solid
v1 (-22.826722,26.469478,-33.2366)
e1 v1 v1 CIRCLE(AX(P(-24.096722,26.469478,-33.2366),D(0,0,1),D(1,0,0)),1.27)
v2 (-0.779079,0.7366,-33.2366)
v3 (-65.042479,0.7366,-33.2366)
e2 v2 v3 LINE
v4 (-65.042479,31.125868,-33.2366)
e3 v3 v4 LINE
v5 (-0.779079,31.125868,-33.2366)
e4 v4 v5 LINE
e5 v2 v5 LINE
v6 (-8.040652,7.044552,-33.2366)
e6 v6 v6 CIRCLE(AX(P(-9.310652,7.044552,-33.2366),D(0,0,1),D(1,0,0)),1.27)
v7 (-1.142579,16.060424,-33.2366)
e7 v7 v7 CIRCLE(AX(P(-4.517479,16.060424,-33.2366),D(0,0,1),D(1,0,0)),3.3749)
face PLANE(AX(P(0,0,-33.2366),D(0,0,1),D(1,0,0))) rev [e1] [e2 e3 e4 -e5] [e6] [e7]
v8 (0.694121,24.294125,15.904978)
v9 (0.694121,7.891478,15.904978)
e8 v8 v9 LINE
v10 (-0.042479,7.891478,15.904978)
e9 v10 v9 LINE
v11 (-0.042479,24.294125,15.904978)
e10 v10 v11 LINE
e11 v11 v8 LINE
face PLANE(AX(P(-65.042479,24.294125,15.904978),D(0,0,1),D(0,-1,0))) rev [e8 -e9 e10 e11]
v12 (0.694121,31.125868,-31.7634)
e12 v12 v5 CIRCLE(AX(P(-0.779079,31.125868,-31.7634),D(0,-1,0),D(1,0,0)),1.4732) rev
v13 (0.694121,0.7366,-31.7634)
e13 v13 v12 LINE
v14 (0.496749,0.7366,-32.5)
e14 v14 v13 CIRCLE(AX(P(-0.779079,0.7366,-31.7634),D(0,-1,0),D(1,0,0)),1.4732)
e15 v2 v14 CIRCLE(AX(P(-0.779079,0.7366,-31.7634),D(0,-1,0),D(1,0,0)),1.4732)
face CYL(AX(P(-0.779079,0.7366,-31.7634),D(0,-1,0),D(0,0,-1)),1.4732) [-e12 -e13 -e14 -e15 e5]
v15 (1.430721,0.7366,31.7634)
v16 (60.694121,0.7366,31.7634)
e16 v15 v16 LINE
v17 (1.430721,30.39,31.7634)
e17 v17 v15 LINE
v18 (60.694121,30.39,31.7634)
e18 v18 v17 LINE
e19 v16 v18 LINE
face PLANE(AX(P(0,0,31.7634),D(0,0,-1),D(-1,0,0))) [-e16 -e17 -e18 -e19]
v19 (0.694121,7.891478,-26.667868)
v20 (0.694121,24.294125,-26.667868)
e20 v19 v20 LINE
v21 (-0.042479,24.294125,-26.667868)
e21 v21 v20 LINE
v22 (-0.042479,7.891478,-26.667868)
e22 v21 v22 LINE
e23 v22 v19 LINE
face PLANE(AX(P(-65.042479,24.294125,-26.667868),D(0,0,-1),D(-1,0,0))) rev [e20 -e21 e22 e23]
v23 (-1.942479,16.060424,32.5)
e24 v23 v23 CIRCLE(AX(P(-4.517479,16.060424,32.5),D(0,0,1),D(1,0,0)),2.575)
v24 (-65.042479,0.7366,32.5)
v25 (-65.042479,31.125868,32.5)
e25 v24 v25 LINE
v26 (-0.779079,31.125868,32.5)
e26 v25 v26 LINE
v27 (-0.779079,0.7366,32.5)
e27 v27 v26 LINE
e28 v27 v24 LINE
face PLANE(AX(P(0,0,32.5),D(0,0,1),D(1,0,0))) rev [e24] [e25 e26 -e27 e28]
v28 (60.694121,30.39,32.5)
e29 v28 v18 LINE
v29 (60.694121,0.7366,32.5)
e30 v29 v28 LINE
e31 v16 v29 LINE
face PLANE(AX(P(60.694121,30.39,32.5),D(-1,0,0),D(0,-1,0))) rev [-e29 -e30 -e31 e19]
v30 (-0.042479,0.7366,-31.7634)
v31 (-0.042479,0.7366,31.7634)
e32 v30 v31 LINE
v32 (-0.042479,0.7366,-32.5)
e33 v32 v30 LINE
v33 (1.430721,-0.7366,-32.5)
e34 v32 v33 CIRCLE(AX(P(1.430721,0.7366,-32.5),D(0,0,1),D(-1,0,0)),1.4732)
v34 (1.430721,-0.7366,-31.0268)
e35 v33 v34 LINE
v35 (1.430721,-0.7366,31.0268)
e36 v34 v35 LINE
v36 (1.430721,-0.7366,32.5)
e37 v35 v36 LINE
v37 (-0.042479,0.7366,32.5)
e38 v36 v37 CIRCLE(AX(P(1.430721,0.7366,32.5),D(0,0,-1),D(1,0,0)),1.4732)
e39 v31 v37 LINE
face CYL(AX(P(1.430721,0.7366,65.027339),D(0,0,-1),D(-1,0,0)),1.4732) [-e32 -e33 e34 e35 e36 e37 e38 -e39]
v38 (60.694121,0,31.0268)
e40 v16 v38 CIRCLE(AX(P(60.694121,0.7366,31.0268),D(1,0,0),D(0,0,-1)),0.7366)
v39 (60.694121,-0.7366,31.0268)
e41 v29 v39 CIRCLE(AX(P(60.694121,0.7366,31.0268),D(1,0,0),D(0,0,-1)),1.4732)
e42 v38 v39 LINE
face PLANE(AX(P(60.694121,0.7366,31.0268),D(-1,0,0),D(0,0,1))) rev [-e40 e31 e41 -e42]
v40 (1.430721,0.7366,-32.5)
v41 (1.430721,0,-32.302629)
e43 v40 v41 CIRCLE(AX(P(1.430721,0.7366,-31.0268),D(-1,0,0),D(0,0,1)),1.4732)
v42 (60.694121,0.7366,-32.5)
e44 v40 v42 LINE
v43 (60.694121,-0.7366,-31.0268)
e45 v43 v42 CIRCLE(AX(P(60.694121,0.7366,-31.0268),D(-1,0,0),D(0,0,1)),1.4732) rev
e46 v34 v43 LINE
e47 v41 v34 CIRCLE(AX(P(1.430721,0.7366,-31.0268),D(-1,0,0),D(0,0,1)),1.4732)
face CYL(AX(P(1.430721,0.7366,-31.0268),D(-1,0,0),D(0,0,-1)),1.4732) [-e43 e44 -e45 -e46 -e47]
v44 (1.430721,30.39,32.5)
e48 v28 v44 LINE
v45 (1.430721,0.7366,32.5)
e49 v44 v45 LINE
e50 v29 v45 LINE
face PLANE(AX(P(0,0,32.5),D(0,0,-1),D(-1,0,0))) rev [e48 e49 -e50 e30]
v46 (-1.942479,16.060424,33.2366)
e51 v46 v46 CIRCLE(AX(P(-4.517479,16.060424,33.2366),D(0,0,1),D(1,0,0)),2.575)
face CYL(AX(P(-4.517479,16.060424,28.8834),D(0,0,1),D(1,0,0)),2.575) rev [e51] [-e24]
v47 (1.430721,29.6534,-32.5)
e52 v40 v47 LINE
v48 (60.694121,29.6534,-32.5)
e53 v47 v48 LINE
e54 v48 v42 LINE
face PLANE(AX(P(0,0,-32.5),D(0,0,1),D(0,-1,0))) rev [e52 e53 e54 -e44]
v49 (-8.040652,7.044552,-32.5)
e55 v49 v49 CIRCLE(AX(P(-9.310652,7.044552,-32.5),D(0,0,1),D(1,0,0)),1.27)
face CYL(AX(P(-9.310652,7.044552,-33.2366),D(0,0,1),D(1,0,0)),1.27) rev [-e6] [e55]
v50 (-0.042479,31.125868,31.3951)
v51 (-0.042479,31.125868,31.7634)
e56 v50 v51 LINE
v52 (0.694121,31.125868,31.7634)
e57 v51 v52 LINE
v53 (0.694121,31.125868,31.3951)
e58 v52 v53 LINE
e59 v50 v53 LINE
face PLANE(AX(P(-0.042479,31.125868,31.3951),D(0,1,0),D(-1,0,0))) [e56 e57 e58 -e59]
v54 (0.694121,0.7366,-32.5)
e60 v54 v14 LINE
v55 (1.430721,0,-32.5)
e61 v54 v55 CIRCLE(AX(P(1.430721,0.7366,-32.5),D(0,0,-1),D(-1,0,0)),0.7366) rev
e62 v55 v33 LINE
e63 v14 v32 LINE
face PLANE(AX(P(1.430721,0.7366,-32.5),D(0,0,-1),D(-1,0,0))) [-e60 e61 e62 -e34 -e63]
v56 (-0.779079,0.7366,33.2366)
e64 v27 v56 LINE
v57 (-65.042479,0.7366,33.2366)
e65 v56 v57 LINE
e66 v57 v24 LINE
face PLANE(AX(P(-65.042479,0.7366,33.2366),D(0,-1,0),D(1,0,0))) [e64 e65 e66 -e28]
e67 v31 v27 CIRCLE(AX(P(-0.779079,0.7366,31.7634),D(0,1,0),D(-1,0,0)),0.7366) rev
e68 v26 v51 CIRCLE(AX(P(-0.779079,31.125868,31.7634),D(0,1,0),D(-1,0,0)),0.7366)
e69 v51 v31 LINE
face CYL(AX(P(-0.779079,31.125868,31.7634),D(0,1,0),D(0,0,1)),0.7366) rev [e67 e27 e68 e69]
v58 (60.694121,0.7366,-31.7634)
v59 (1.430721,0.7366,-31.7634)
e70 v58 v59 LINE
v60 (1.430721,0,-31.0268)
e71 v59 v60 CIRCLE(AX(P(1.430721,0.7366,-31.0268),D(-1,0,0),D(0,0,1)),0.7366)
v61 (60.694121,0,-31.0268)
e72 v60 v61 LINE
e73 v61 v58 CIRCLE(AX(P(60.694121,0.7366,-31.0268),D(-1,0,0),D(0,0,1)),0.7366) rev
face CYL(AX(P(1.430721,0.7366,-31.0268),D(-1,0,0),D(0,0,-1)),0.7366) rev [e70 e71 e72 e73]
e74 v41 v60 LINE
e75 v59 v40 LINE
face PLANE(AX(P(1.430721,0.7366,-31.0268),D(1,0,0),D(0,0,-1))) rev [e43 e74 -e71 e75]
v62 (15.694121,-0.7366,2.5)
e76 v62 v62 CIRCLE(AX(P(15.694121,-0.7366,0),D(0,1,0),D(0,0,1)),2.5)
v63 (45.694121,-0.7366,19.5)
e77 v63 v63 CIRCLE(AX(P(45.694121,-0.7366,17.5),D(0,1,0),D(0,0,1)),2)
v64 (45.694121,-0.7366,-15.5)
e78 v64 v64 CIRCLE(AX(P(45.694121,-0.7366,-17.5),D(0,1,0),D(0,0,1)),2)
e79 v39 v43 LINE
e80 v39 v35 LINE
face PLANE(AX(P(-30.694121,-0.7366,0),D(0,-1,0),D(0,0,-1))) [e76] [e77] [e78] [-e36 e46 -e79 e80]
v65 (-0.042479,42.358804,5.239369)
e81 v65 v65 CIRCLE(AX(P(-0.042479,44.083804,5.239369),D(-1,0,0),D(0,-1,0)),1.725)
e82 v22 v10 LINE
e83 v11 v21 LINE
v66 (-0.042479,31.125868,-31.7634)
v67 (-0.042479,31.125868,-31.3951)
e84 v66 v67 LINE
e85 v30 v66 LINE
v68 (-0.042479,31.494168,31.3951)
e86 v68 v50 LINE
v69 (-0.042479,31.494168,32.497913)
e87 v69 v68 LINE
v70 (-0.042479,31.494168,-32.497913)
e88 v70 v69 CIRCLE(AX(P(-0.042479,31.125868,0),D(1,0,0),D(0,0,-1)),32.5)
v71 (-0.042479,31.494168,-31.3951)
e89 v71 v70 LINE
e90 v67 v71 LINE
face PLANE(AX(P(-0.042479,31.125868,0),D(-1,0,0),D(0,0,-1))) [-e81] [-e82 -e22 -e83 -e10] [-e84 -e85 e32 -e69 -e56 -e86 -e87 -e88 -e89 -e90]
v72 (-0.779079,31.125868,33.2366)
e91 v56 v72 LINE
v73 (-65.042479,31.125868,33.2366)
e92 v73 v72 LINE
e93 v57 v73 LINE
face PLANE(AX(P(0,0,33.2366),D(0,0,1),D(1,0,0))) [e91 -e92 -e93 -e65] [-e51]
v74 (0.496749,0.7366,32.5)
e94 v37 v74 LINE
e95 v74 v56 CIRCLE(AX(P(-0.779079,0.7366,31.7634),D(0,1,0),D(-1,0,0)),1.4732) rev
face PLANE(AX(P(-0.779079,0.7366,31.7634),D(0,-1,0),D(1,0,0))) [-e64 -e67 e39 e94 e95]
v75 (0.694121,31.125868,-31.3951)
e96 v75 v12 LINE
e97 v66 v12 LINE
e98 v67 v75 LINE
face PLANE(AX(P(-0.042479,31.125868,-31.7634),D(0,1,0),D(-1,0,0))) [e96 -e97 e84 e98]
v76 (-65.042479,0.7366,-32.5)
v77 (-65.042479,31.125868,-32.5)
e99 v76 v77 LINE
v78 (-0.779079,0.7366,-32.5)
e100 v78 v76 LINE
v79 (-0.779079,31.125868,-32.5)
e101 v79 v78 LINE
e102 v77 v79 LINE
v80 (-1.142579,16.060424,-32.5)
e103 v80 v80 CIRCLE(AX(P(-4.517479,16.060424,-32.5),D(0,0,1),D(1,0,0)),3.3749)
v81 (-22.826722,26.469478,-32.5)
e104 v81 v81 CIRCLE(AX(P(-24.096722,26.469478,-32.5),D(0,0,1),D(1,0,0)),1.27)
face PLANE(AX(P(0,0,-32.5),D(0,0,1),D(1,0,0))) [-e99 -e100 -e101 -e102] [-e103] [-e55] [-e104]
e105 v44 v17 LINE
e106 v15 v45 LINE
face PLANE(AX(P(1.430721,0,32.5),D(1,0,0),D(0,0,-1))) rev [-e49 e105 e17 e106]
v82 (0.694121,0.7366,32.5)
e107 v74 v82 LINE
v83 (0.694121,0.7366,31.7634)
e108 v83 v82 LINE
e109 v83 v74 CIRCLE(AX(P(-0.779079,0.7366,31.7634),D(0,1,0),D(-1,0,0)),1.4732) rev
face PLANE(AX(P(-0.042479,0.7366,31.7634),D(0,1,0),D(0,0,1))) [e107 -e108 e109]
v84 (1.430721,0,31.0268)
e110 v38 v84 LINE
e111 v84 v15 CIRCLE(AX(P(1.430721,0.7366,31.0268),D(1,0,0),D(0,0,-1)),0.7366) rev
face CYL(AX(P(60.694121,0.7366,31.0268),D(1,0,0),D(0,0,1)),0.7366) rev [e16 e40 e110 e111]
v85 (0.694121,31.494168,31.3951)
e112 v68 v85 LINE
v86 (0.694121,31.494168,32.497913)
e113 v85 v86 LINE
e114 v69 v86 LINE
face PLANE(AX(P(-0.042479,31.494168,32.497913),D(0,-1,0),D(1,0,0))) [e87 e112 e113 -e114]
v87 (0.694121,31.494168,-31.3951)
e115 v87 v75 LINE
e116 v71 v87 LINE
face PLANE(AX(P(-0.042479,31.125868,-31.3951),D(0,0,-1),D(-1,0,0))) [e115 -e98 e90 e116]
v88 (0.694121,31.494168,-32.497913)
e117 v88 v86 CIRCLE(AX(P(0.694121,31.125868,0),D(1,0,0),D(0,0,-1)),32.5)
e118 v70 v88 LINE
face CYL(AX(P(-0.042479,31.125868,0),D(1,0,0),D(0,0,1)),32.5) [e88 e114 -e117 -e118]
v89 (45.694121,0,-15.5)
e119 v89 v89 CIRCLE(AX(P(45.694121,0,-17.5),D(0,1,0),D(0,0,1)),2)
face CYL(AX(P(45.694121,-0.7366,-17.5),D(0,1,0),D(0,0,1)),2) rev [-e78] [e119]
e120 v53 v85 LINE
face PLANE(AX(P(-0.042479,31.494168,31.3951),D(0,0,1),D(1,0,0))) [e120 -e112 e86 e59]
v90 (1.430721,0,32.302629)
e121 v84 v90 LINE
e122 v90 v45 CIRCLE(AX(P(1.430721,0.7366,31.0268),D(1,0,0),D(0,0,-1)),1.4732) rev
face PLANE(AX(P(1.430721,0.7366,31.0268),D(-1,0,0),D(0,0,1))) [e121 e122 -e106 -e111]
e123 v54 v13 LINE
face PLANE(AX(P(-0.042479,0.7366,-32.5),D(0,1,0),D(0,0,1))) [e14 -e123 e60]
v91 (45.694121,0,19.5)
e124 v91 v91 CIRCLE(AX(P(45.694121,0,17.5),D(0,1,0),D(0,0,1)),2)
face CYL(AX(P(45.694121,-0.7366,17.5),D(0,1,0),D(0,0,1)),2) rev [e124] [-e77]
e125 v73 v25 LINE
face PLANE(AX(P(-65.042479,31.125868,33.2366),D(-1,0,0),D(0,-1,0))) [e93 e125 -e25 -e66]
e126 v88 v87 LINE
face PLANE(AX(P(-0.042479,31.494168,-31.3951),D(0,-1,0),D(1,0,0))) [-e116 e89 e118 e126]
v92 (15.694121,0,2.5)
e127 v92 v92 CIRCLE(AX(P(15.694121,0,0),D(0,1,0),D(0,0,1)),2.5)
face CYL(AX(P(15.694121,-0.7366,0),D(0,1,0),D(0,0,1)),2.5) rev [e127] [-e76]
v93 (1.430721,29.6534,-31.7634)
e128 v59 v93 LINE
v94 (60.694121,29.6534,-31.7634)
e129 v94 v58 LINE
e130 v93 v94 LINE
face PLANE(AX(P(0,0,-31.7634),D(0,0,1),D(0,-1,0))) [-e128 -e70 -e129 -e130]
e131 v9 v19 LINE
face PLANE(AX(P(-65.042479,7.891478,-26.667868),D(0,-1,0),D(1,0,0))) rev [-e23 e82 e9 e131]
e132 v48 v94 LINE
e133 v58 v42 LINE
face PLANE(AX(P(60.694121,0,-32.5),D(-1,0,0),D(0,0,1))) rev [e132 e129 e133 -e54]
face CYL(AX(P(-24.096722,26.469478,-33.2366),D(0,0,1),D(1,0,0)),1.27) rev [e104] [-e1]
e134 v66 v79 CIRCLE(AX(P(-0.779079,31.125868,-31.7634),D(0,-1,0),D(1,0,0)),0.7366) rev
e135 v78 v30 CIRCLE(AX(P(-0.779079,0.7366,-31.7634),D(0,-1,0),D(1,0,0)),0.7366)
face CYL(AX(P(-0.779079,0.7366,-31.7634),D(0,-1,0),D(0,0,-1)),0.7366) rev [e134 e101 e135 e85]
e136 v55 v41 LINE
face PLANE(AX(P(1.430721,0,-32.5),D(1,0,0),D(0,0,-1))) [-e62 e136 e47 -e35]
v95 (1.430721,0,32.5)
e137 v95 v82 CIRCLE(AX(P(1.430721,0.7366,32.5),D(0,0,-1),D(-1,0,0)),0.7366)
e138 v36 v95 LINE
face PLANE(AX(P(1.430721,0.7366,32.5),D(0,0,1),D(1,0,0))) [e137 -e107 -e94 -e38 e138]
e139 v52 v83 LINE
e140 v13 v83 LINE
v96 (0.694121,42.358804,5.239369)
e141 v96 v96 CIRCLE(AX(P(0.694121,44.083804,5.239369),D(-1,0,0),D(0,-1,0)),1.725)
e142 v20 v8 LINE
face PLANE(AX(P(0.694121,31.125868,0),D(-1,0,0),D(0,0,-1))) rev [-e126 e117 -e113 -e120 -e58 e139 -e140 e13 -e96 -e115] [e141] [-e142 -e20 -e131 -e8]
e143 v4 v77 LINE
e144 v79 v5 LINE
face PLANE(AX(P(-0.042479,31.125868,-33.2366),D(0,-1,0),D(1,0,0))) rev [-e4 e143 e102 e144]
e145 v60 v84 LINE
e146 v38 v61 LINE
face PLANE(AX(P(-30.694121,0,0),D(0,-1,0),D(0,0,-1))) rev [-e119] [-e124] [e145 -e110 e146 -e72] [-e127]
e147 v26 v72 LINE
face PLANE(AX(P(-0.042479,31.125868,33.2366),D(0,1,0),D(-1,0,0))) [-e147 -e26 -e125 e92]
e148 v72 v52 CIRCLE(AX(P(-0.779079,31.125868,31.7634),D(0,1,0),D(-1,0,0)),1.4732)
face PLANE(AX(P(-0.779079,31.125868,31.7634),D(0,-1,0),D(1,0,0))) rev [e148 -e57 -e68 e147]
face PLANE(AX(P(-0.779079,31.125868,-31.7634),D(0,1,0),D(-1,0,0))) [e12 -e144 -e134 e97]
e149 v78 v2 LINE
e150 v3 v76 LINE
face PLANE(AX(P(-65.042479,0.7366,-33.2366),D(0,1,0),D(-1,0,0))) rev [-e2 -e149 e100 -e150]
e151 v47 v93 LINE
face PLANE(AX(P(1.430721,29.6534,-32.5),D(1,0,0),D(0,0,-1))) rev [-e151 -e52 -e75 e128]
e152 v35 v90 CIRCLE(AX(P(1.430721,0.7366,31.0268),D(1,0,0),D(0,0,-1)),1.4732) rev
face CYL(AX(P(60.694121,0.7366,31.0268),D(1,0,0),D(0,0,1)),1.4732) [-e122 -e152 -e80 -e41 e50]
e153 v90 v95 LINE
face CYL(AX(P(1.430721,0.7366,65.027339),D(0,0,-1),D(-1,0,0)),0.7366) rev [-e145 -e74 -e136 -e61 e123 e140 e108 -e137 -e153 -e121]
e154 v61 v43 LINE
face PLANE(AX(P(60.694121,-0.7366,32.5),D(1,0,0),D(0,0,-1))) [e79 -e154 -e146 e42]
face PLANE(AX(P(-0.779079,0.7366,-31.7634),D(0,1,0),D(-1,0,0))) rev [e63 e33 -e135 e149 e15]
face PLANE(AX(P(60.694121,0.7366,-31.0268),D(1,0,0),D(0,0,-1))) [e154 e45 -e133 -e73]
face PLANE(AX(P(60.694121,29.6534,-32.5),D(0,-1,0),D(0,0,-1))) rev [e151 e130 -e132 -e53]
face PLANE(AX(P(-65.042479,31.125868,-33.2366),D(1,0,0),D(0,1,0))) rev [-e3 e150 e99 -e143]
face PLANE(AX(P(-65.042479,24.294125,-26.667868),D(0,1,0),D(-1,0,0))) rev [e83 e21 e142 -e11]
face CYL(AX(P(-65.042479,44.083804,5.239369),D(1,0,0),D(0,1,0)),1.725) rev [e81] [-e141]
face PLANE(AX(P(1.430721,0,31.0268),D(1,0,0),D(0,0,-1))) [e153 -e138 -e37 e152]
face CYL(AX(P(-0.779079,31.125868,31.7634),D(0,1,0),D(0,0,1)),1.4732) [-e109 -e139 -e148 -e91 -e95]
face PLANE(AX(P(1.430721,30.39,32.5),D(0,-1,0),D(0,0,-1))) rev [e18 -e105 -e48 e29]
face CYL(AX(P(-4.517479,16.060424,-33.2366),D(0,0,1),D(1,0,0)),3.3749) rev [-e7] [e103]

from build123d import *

# Parameters (mm, degrees)
SKETCH1_R                    = 2.5
BASE_FLANGE3_DEPTH           = 0.7366
SKETCHED_START               = -64
SKETCHED_BEND1_OUTLINE_W     = 0.7366
SKETCHED_BEND1_OUTLINE_H     = 65
SKETCHED_BEND1_DEPTH         = 64.108877104
SKETCHED_START_2             = 0.168203781
SKETCHED_BEND1_2_DEPTH       = 0.525916755
SKETCHED_START_3             = -0.042479464
SKETCHED_BEND1_3_DEPTH       = 1.4732
SKETCHED_START_4             = -32.5
SKETCHED_BEND1_4_DEPTH       = 65
EDGE_FLANGE1_START           = 0.7366
EDGE_FLANGE1_DEPTH           = 30.75756821
EDGE_FLANGE1_START_2         = 31.12586821
EDGE_FLANGE1_2_DEPTH         = 0.3683
EDGE_FLANGE1_3_DEPTH         = 30.38926821
SKETCH19_R                   = 1.27
SKETCH19_R_2                 = 3.3749
CUT_EXTRUDE5_DEPTH           = 112.820280988
SKETCH20_W                   = 42.572846016
SKETCH20_H                   = 16.402646855
CUT_EXTRUDE6_DEPTH           = 98.335621766
EDGE_FLANGE2_START           = 0.7366
EDGE_FLANGE2_DEPTH           = 30.75756821
EDGE_FLANGE2_START_2         = 31.12586821
EDGE_FLANGE2_2_DEPTH         = 0.3683
EDGE_FLANGE2_3_DEPTH         = 30.38926821
SKETCH27_R                   = 2.575
CUT_EXTRUDE7_DEPTH           = 10
CUT_EXTRUDE8_DEPTH           = 98.335621766
CUT_EXTRUDE8_DEPTH_BACK      = 98.335621766
SKETCH28_R                   = 1.725
SKETCH33_W                   = 30
SKETCH33_H                   = 65
SKETCH33_R                   = 2
TAB1_DEPTH                   = 0.7366
EDGE_FLANGE3_STRIP_W         = 4.4196
EDGE_FLANGE3_STRIP_H         = 0.7366
EDGE_FLANGE3_STRIP_CUT_DEPTH = 59.2634
EDGE_FLANGE3_DEPTH           = 59.2634
EDGE_FLANGE4_STRIP_W         = 4.4196
EDGE_FLANGE4_STRIP_H         = 0.7366
EDGE_FLANGE4_STRIP_CUT_DEPTH = 59.2634
EDGE_FLANGE4_DEPTH           = 59.2634


with BuildPart() as part:
    # Base-Flange3: sheet metal written as solids
    # Sketch1 → Base-Flange3 (new body)
    with BuildSketch(Plane(origin=(0, 0, 0), x_dir=(1, 0, 0), z_dir=(0, 1, 0))):
        with BuildLine():
            Line((-30.694120536, 32.5), (30.694120536, 32.5))
            Line((30.694120536, 32.5), (30.694120536, -32.5))
            Line((30.694120536, -32.5), (-30.694120536, -32.5))
            ThreePointArc((-30.694120536, -32.5), (-63.194120536, 0), (-30.694120536, 32.5))
        make_face()
        with Locations(Location((15.694120536, 0, 0), (0, 0, 270))):
            Circle(SKETCH1_R, mode=Mode.SUBTRACT)
    extrude(amount=-BASE_FLANGE3_DEPTH)

    # Sketched Bend1: read off the stored shape, not the designer's step
    # Sketched Bend1 outline → Sketched Bend1 (cut)
    with BuildSketch(Plane.YZ.offset(SKETCHED_START)):
        with Locations((-0.3683, 0)):
            Rectangle(SKETCHED_BEND1_OUTLINE_W, SKETCHED_BEND1_OUTLINE_H)
    extrude(amount=SKETCHED_BEND1_DEPTH, mode=Mode.SUBTRACT)

    # Sketched Bend1 2 outline → Sketched Bend1 2 (add)
    with BuildSketch(Plane.YZ.offset(SKETCHED_START_2)):
        with BuildLine():
            ThreePointArc((31.12586821, -32.5), (63.62586821, 0), (31.12586821, 32.5))
            Line((31.12586821, 32.5), (0, 32.5))
            Line((0, 32.5), (0, -32.5))
            Line((0, -32.5), (31.12586821, -32.5))
        make_face()
    extrude(amount=SKETCHED_BEND1_2_DEPTH)

    # Sketched Bend1 3 outline → Sketched Bend1 3 (add)
    with BuildSketch(Plane.YZ.offset(SKETCHED_START_3)):
        with BuildLine():
            ThreePointArc((31.12586821, -32.5), (63.62586821, 0), (31.12586821, 32.5))
            Line((31.12586821, 32.5), (0, 32.5))
            Line((0, 32.5), (0, -32.5))
            Line((0, -32.5), (31.12586821, -32.5))
        make_face()
    extrude(amount=SKETCHED_BEND1_3_DEPTH)

    # Sketched Bend1 4 outline → Sketched Bend1 4 (cut)
    with BuildSketch(Plane.XY.offset(SKETCHED_START_4)):
        with BuildLine():
            Line((0.694120536, 65), (0.694120536, 0.7366))
            ThreePointArc((0.694120536, 0.7366), (0.90986568, 0.215745144), (1.430720536, 0))
            Line((1.430720536, 0), (1.430720536, 65))
            Line((1.430720536, 65), (0.694120536, 65))
        make_face()
        with BuildLine():
            Line((-0.042479464, 0.7366), (-0.042479396, 65))
            Line((-0.042479396, 65), (-2, 65))
            Line((-2, 65), (-2, 0))
            Line((-2, 0), (0.108877104, 0))
            Line((0.108877104, 0), (0.108877104, -2))
            Line((0.108877104, -2), (32, -2))
            Line((32, -2), (32, -0.736599968))
            Line((32, -0.736599968), (1.430720536, -0.7366))
            ThreePointArc((1.430720536, -0.7366), (0.389010825, -0.30510971), (-0.042479464, 0.7366))
        make_face()
    extrude(amount=SKETCHED_BEND1_4_DEPTH, mode=Mode.SUBTRACT)

    # Edge-Flange1: read off the stored shape, not the designer's step
    # Edge-Flange1 outline → Edge-Flange1 (cut)
    with BuildSketch(Plane(origin=(0, 0, 0), x_dir=(1, 0, 0), z_dir=(0, 1, 0)).offset(EDGE_FLANGE1_START)):
        with BuildLine():
            ThreePointArc((0.496749161, 32.5), (0.643922463, 32.144692217), (0.694120536, 31.7634))
            Line((0.694120536, 31.7634), (0.694120536, 32.5))
            Line((0.694120536, 32.5), (0.496749161, 32.5))
        make_face()
    extrude(amount=EDGE_FLANGE1_DEPTH, mode=Mode.SUBTRACT)

    # Edge-Flange1 2 outline → Edge-Flange1 2 (cut)
    with BuildSketch(Plane(origin=(0, 0, 0), x_dir=(1, 0, 0), z_dir=(0, 1, 0)).offset(EDGE_FLANGE1_START_2)):
        with BuildLine():
            Line((-0.042479464, 31.3951), (0.694120536, 31.3951))
            Line((0.694120536, 31.3951), (0.694120536, 31.7634))
            ThreePointArc((0.694120536, 31.7634), (0.643922463, 32.144692217), (0.496749161, 32.5))
            Line((0.496749161, 32.5), (-0.042479464, 32.5))
            Line((-0.042479464, 32.5), (-0.042479464, 31.3951))
        make_face()
    extrude(amount=EDGE_FLANGE1_2_DEPTH, mode=Mode.SUBTRACT)

    # Edge-Flange1 3 outline → Edge-Flange1 3 (add)
    with BuildSketch(Plane(origin=(0, 0, 0), x_dir=(1, 0, 0), z_dir=(0, 1, 0)).offset(EDGE_FLANGE1_START)):
        with BuildLine():
            ThreePointArc((-0.779079464, 32.5), (-0.258224609, 32.284254855), (-0.042479464, 31.7634))
            Line((-0.042479464, 31.7634), (-0.042479464, 32.5))
            Line((-0.042479464, 32.5), (0.496749161, 32.5))
            ThreePointArc((0.496749161, 32.5), (-0.042479464, 33.039228625), (-0.779079464, 33.2366))
            Line((-0.779079464, 33.2366), (-65.042479464, 33.2366))
            Line((-65.042479464, 33.2366), (-65.042479464, 32.5))
            Line((-65.042479464, 32.5), (-0.779079464, 32.5))
        make_face()
    extrude(amount=EDGE_FLANGE1_3_DEPTH)

    # Sketch19 → Cut-Extrude5 (cut, through all)
    with BuildSketch(Plane.XY.offset(-32.5)):
        with Locations((-24.096722092, 26.469477583)):
            Circle(SKETCH19_R)
        with Locations((-9.310652066, 7.044552475)):
            Circle(SKETCH19_R)
        with Locations((-4.517479464, 16.06042365)):
            Circle(SKETCH19_R_2)
    extrude(amount=-CUT_EXTRUDE5_DEPTH, mode=Mode.SUBTRACT)

    # Sketch20 → Cut-Extrude6 (cut, through all)
    with BuildSketch(Plane(origin=(0.694120536, 0, 0), x_dir=(0, 0, -1), z_dir=(1, 0, 0))):
        with Locations((5.381444798, 16.092801871)):
            Rectangle(SKETCH20_W, SKETCH20_H)
    extrude(amount=-CUT_EXTRUDE6_DEPTH, mode=Mode.SUBTRACT)

    # Edge-Flange2: read off the stored shape, not the designer's step
    # Edge-Flange2 outline → Edge-Flange2 (cut)
    with BuildSketch(Plane(origin=(0, 0, 0), x_dir=(1, 0, 0), z_dir=(0, 1, 0)).offset(EDGE_FLANGE2_START)):
        with BuildLine():
            ThreePointArc((0.694120536, -31.7634), (0.643922463, -32.144692217), (0.496749161, -32.5))
            Line((0.496749161, -32.5), (0.694120536, -32.5))
            Line((0.694120536, -32.5), (0.694120536, -31.7634))
        make_face()
    extrude(amount=EDGE_FLANGE2_DEPTH, mode=Mode.SUBTRACT)

    # Edge-Flange2 2 outline → Edge-Flange2 2 (cut)
    with BuildSketch(Plane(origin=(0, 0, 0), x_dir=(1, 0, 0), z_dir=(0, 1, 0)).offset(EDGE_FLANGE2_START_2)):
        with BuildLine():
            Line((-0.042479464, -31.3951), (-0.042479464, -32.5))
            Line((-0.042479464, -32.5), (0.496749161, -32.5))
            ThreePointArc((0.496749161, -32.5), (0.643922463, -32.144692217), (0.694120536, -31.7634))
            Line((0.694120536, -31.7634), (0.694120536, -31.3951))
            Line((0.694120536, -31.3951), (-0.042479464, -31.3951))
        make_face()
    extrude(amount=EDGE_FLANGE2_2_DEPTH, mode=Mode.SUBTRACT)

    # Edge-Flange2 3 outline → Edge-Flange2 3 (add)
    with BuildSketch(Plane(origin=(0, 0, 0), x_dir=(1, 0, 0), z_dir=(0, 1, 0)).offset(EDGE_FLANGE2_START)):
        with BuildLine():
            Line((-0.779079464, -32.5), (-65.042479464, -32.5))
            Line((-65.042479464, -32.5), (-65.042479464, -33.2366))
            Line((-65.042479464, -33.2366), (-0.779079464, -33.2366))
            ThreePointArc((-0.779079464, -33.2366), (-0.042479464, -33.039228625), (0.496749161, -32.5))
            Line((0.496749161, -32.5), (-0.042479464, -32.5))
            Line((-0.042479464, -32.5), (-0.042479464, -31.7634))
            ThreePointArc((-0.042479464, -31.7634), (-0.258224609, -32.284254855), (-0.779079464, -32.5))
        make_face()
    extrude(amount=EDGE_FLANGE2_3_DEPTH)

    # Sketch27 → Cut-Extrude7 (cut)
    with BuildSketch(Plane.XY.offset(38.8834)):
        with Locations((-4.517479464, 16.06042365)):
            Circle(SKETCH27_R)
    extrude(amount=-CUT_EXTRUDE7_DEPTH, mode=Mode.SUBTRACT)

    # Sketch28 → Cut-Extrude8 (cut, two sides: drawn at the far end of the back side and taken through both)
    with BuildSketch(Plane(origin=(0.694120536, 0, 0), x_dir=(0, 0, -1), z_dir=(1, 0, 0)).offset(-CUT_EXTRUDE8_DEPTH_BACK)):
        with Locations(Location((-5.239369246, 44.083803898, 0), (0, 0, 270))):
            Circle(SKETCH28_R)
    extrude(amount=CUT_EXTRUDE8_DEPTH + CUT_EXTRUDE8_DEPTH_BACK, mode=Mode.SUBTRACT)

    # Tab1: sheet metal written as solids
    # Sketch33 → Tab1 (add)
    with BuildSketch(Plane(origin=(0, 0, 0), x_dir=(1, 0, 0), z_dir=(0, 1, 0))):
        with Locations((45.694120536, 0)):
            Rectangle(SKETCH33_W, SKETCH33_H)
        with Locations(Location((45.694120536, 17.5, 0), (0, 0, 270))):
            Circle(SKETCH33_R, mode=Mode.SUBTRACT)
        with Locations(Location((45.694120536, -17.5, 0), (0, 0, 270))):
            Circle(SKETCH33_R, mode=Mode.SUBTRACT)
    extrude(amount=-TAB1_DEPTH)

    # Edge-Flange3: sheet metal written as solids
    # Edge-Flange3 strip (on a plane across the edge) → Edge-Flange3 strip cut (cut)
    with BuildSketch(Plane(origin=(1.430720536, 0, 32.5), x_dir=(0, 0, -1), z_dir=(1, 0, 0))):
        with Locations((-0.7366, -0.3683)):
            Rectangle(EDGE_FLANGE3_STRIP_W, EDGE_FLANGE3_STRIP_H)
    extrude(amount=EDGE_FLANGE3_STRIP_CUT_DEPTH, mode=Mode.SUBTRACT)

    # Edge-Flange3 section (on a plane across the edge) → Edge-Flange3 (add)
    with BuildSketch(Plane(origin=(1.430720536, 0, 32.5), x_dir=(0, 0, -1), z_dir=(1, 0, 0))):
        with BuildLine():
            Line((0, 0.7366), (0, 30.39))
            Line((0, 30.39), (0.7366, 30.39))
            Line((0.7366, 30.39), (0.7366, 0.7366))
            ThreePointArc((0.7366, 0.7366), (0.952345145, 0.215745145), (1.4732, 0))
            Line((1.4732, 0), (1.4732, -0.7366))
            ThreePointArc((1.4732, -0.7366), (0.43149029, -0.30510971), (0, 0.7366))
        make_face()
    extrude(amount=EDGE_FLANGE3_DEPTH)

    # Edge-Flange4: sheet metal written as solids
    # Edge-Flange4 strip (on a plane across the edge) → Edge-Flange4 strip cut (cut)
    with BuildSketch(Plane(origin=(60.694120536, 0, -32.5), x_dir=(0, 0, 1), z_dir=(-1, 0, 0))):
        with Locations((-0.7366, -0.3683)):
            Rectangle(EDGE_FLANGE4_STRIP_W, EDGE_FLANGE4_STRIP_H)
    extrude(amount=EDGE_FLANGE4_STRIP_CUT_DEPTH, mode=Mode.SUBTRACT)

    # Edge-Flange4 section (on a plane across the edge) → Edge-Flange4 (add)
    with BuildSketch(Plane(origin=(60.694120536, 0, -32.5), x_dir=(0, 0, 1), z_dir=(-1, 0, 0))):
        with BuildLine():
            Line((0, 0.7366), (0, 29.6534))
            Line((0, 29.6534), (0.7366, 29.6534))
            Line((0.7366, 29.6534), (0.7366, 0.7366))
            ThreePointArc((0.7366, 0.7366), (0.952345145, 0.215745145), (1.4732, 0))
            Line((1.4732, 0), (1.4732, -0.7366))
            ThreePointArc((1.4732, -0.7366), (0.43149029, -0.30510971), (0, 0.7366))
        make_face()
    extrude(amount=EDGE_FLANGE4_DEPTH)


solid = part.part
